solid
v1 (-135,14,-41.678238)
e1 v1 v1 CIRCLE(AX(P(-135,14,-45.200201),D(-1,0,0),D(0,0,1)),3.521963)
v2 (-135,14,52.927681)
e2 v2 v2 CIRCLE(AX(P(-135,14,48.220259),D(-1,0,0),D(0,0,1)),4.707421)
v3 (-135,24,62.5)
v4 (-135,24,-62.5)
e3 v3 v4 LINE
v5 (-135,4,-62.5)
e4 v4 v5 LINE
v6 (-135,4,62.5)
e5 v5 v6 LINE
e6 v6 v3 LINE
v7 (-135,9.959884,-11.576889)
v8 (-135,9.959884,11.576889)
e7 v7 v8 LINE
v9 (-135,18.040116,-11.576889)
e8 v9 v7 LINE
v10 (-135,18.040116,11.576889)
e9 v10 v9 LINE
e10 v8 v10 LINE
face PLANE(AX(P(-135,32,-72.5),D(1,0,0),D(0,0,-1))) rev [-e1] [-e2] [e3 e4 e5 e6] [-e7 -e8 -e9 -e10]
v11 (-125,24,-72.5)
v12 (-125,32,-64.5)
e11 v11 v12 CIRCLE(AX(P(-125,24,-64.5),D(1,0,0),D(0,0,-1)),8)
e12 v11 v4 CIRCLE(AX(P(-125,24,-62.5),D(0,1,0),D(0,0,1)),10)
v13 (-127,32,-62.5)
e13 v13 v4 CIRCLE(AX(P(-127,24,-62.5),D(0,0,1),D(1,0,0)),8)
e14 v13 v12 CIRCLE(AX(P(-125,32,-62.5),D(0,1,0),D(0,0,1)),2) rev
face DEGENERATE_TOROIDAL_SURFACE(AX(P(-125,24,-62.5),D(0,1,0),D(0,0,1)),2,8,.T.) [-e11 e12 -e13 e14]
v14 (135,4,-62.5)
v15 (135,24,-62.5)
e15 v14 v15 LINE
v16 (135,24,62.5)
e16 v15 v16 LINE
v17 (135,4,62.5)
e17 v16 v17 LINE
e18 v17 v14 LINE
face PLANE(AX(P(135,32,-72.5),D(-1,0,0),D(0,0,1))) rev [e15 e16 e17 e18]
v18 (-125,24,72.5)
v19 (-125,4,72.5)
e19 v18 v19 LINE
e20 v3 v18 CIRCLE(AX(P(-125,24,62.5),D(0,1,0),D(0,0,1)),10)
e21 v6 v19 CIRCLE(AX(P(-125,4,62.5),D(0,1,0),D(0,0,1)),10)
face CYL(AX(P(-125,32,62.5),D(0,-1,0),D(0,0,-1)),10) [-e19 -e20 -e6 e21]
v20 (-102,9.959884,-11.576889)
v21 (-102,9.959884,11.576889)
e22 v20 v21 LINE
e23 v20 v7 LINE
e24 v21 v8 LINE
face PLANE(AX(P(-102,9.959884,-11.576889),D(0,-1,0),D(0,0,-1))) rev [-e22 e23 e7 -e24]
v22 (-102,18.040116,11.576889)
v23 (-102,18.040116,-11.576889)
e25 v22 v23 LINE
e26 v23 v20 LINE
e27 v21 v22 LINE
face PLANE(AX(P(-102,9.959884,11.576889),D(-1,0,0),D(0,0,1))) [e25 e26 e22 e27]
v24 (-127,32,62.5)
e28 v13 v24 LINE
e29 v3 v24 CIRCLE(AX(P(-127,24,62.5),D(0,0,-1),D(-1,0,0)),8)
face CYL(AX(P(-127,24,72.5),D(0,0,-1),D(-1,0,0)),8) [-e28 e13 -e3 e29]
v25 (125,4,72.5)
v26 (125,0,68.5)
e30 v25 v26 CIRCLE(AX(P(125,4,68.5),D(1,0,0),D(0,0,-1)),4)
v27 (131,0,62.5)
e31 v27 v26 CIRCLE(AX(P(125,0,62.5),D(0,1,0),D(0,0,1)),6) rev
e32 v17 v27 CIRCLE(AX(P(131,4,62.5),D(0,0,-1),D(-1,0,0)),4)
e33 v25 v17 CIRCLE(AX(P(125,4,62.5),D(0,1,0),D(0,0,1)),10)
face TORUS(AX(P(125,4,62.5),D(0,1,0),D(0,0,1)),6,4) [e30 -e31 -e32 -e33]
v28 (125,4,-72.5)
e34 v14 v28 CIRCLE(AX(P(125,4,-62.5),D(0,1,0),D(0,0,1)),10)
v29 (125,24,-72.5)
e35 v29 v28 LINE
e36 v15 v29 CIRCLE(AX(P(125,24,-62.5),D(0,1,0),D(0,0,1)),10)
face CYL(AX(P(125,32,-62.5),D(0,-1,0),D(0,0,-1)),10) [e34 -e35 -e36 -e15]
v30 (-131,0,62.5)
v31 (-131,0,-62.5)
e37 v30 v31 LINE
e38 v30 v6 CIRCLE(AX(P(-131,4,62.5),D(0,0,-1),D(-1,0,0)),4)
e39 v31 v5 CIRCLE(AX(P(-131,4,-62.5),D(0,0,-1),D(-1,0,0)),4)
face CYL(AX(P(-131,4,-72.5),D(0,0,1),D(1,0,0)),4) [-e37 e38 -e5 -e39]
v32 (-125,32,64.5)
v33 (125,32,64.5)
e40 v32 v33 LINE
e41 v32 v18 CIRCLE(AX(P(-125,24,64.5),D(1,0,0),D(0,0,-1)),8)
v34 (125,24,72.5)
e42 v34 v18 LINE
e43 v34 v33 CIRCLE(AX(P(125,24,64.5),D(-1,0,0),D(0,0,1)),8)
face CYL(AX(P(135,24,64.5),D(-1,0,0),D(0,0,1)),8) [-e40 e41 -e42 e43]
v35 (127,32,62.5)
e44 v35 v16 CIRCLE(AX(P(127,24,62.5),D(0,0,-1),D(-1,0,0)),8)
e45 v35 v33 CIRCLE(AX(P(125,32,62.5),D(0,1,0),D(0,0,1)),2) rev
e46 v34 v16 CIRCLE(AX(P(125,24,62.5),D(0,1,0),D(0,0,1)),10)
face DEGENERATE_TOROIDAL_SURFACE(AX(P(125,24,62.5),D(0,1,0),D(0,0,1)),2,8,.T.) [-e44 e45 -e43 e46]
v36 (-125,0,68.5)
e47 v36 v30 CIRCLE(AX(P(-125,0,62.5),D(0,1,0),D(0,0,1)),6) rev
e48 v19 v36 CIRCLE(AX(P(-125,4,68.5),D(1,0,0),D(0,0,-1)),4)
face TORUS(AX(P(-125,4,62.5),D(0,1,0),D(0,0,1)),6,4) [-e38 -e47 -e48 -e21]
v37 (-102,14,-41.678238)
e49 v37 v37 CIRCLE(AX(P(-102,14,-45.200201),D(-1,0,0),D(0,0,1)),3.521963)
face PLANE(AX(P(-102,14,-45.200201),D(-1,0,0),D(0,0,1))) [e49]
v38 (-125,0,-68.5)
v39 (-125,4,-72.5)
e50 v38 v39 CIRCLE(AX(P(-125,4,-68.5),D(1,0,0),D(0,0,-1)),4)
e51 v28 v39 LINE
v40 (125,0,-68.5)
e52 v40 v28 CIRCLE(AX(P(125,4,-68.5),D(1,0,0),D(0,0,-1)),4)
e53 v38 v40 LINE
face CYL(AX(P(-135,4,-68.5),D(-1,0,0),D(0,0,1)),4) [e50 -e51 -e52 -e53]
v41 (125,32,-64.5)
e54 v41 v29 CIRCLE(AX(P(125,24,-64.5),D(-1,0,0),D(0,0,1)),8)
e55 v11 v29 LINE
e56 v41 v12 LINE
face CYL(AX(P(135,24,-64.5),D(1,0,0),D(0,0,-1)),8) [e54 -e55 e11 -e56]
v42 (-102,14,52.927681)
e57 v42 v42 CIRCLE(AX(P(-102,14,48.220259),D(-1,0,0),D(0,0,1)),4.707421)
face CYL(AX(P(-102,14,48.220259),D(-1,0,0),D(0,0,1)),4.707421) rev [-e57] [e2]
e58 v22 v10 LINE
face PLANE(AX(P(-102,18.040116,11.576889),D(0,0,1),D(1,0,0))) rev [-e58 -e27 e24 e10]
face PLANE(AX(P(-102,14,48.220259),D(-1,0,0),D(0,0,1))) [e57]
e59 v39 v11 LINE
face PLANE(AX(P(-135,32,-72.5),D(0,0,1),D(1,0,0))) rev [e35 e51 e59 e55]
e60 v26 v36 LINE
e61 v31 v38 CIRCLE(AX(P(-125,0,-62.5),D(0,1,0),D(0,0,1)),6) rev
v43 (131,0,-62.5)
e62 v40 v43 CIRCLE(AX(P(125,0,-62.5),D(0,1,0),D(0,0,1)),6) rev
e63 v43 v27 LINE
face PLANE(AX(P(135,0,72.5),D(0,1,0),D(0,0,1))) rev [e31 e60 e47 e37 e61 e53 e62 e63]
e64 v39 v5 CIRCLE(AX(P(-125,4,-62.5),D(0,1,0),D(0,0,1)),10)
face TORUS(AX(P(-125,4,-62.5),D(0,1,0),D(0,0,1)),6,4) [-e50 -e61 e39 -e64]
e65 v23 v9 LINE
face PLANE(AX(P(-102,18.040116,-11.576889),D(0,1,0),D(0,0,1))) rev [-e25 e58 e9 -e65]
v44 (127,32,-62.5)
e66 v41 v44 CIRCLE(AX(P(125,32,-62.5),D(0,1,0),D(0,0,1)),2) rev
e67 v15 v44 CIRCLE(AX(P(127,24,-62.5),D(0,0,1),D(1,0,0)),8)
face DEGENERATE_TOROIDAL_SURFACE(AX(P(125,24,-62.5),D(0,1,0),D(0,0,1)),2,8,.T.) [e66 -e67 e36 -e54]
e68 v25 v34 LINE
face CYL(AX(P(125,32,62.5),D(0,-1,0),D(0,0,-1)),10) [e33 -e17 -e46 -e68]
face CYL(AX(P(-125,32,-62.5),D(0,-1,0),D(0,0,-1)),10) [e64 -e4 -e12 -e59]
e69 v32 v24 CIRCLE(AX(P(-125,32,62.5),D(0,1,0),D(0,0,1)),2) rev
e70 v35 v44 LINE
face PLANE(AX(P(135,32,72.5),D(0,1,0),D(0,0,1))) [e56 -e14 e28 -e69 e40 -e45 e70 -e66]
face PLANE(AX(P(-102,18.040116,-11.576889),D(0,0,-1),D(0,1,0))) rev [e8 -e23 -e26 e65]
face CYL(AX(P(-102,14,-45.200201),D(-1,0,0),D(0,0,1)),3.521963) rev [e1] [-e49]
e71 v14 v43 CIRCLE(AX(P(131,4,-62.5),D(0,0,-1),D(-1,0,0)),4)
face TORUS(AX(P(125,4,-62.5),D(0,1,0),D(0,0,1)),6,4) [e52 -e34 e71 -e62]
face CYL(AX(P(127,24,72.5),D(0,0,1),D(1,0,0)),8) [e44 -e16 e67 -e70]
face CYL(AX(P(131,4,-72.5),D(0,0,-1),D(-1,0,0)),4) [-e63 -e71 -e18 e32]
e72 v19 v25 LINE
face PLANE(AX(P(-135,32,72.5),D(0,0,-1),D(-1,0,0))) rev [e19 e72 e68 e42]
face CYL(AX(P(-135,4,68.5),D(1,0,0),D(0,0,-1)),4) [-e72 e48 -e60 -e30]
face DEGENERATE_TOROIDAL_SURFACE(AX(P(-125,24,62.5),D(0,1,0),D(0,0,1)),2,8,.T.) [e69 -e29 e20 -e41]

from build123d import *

# Parameters (mm, degrees)
SKETCH1_W           = 270
SKETCH1_H           = 145
BOSS_EXTRUDE1_DEPTH = 32
FILLET1_R           = 8
FILLET2_R           = 10
FILLET3_R           = 4
SKETCH2_R           = 3.521962556
SKETCH2_R_2         = 4.707421484
SKETCH2_W           = 23.153777818
SKETCH2_H           = 8.080231906
CUT_EXTRUDE1_DEPTH  = 33


with BuildPart() as part:
    # Sketch1 → Boss-Extrude1 (new body)
    with BuildSketch(Plane(origin=(0, 0, 0), x_dir=(1, 0, 0), z_dir=(0, 1, 0))):
        Rectangle(SKETCH1_W, SKETCH1_H)
    extrude(amount=BOSS_EXTRUDE1_DEPTH)

    # Fillet1
    fillet1_edges = [part.edges().sort_by_distance(p)[0] for p in [
        (-135, 32, 0),
        (0, 32, 72.5),
        (135, 32, 0),
        (0, 32, -72.5),
    ]]
    fillet(fillet1_edges, radius=FILLET1_R)

    # Fillet2
    # the kernel refuses this fillet: 10 mm, written as the material it takes off along each edge
    with BuildSketch(Plane(origin=(-125, 32, 62.5), x_dir=(-1, 0, 0), z_dir=(0, 0, -1))) as fillet2_piece_1:
        with BuildLine():
            CenterArc((2, -8), 8, 0, 90)
            Line((10, -8), (10, 0))
            Line((10, 0), (2, 0))
        make_face()
    revolve(axis=Axis((-125, 32, 62.5), (0, 1, 0)), revolution_arc=90, mode=Mode.SUBTRACT)
    with BuildSketch(Plane(origin=(-125, 32, -62.5), x_dir=(0, 0, -1), z_dir=(1, 0, 0))) as fillet2_piece_2:
        with BuildLine():
            CenterArc((2, -8), 8, 0, 90)
            Line((10, -8), (10, 0))
            Line((10, 0), (2, 0))
        make_face()
    revolve(axis=Axis((-125, 32, -62.5), (0, 1, 0)), revolution_arc=90, mode=Mode.SUBTRACT)
    with BuildSketch(Plane(origin=(125, 32, 62.5), x_dir=(0, 0, 1), z_dir=(-1, 0, 0))) as fillet2_piece_3:
        with BuildLine():
            CenterArc((2, -8), 8, 0, 90)
            Line((10, -8), (10, 0))
            Line((10, 0), (2, 0))
        make_face()
    revolve(axis=Axis((125, 32, 62.5), (0, 1, 0)), revolution_arc=90, mode=Mode.SUBTRACT)
    with BuildSketch(Plane(origin=(125, 32, -62.5), x_dir=(1, 0, 0), z_dir=(0, 0, 1))) as fillet2_piece_4:
        with BuildLine():
            CenterArc((2, -8), 8, 0, 90)
            Line((10, -8), (10, 0))
            Line((10, 0), (2, 0))
        make_face()
    revolve(axis=Axis((125, 32, -62.5), (0, 1, 0)), revolution_arc=90, mode=Mode.SUBTRACT)
    with BuildSketch(Plane(origin=(135, -25, -72.5), x_dir=(-1, 0, 0), z_dir=(0, 1, 0)), Plane(origin=(135, -25, 72.5), x_dir=(0, 0, -1), z_dir=(0, 1, 0))) as fillet2_piece_5:
        with BuildLine():
            CenterArc((FILLET2_R, FILLET2_R), FILLET2_R, 180, 90)
            Line((0, FILLET2_R), (0, 0))
            Line((0, 0), (FILLET2_R, 0))
        make_face()
    extrude(amount=57, mode=Mode.SUBTRACT)
    with BuildSketch(Plane(origin=(-135, -25, -72.5), x_dir=(1, 0, 0), z_dir=(0, 1, 0)), Plane(origin=(-135, -25, 72.5), x_dir=(0, 0, -1), z_dir=(0, 1, 0))) as fillet2_piece_6:
        with BuildLine():
            CenterArc((FILLET2_R, -FILLET2_R), FILLET2_R, 90, 90)
            Line((0, -FILLET2_R), (0, 0))
            Line((0, 0), (FILLET2_R, 0))
        make_face()
    extrude(amount=57, mode=Mode.SUBTRACT)

    # Fillet3
    fillet3_edges = [part.edges().sort_by_distance(p)[0] for p in [
        (-135, 0, 0),
        (135, 0, 0),
        (0, 0, 72.5),
        (0, 0, -72.5),
        (132.071067812, 0, 69.571067812),
        (132.071067812, 0, -69.571067812),
        (-132.071067812, 0, 69.571067812),
        (-132.071067812, 0, -69.571067812),
    ]]
    fillet(fillet3_edges, radius=FILLET3_R)

    # Sketch2 → Cut-Extrude1 (cut)
    with BuildSketch(Plane.ZY.offset(135)):
        with Locations((-45.200201046, 14)):
            Circle(SKETCH2_R)
        with Locations((48.220259023, 14)):
            Circle(SKETCH2_R_2)
        with Locations((0, 14)):
            Rectangle(SKETCH2_W, SKETCH2_H)
    extrude(amount=-CUT_EXTRUDE1_DEPTH, mode=Mode.SUBTRACT)


solid = part.part
